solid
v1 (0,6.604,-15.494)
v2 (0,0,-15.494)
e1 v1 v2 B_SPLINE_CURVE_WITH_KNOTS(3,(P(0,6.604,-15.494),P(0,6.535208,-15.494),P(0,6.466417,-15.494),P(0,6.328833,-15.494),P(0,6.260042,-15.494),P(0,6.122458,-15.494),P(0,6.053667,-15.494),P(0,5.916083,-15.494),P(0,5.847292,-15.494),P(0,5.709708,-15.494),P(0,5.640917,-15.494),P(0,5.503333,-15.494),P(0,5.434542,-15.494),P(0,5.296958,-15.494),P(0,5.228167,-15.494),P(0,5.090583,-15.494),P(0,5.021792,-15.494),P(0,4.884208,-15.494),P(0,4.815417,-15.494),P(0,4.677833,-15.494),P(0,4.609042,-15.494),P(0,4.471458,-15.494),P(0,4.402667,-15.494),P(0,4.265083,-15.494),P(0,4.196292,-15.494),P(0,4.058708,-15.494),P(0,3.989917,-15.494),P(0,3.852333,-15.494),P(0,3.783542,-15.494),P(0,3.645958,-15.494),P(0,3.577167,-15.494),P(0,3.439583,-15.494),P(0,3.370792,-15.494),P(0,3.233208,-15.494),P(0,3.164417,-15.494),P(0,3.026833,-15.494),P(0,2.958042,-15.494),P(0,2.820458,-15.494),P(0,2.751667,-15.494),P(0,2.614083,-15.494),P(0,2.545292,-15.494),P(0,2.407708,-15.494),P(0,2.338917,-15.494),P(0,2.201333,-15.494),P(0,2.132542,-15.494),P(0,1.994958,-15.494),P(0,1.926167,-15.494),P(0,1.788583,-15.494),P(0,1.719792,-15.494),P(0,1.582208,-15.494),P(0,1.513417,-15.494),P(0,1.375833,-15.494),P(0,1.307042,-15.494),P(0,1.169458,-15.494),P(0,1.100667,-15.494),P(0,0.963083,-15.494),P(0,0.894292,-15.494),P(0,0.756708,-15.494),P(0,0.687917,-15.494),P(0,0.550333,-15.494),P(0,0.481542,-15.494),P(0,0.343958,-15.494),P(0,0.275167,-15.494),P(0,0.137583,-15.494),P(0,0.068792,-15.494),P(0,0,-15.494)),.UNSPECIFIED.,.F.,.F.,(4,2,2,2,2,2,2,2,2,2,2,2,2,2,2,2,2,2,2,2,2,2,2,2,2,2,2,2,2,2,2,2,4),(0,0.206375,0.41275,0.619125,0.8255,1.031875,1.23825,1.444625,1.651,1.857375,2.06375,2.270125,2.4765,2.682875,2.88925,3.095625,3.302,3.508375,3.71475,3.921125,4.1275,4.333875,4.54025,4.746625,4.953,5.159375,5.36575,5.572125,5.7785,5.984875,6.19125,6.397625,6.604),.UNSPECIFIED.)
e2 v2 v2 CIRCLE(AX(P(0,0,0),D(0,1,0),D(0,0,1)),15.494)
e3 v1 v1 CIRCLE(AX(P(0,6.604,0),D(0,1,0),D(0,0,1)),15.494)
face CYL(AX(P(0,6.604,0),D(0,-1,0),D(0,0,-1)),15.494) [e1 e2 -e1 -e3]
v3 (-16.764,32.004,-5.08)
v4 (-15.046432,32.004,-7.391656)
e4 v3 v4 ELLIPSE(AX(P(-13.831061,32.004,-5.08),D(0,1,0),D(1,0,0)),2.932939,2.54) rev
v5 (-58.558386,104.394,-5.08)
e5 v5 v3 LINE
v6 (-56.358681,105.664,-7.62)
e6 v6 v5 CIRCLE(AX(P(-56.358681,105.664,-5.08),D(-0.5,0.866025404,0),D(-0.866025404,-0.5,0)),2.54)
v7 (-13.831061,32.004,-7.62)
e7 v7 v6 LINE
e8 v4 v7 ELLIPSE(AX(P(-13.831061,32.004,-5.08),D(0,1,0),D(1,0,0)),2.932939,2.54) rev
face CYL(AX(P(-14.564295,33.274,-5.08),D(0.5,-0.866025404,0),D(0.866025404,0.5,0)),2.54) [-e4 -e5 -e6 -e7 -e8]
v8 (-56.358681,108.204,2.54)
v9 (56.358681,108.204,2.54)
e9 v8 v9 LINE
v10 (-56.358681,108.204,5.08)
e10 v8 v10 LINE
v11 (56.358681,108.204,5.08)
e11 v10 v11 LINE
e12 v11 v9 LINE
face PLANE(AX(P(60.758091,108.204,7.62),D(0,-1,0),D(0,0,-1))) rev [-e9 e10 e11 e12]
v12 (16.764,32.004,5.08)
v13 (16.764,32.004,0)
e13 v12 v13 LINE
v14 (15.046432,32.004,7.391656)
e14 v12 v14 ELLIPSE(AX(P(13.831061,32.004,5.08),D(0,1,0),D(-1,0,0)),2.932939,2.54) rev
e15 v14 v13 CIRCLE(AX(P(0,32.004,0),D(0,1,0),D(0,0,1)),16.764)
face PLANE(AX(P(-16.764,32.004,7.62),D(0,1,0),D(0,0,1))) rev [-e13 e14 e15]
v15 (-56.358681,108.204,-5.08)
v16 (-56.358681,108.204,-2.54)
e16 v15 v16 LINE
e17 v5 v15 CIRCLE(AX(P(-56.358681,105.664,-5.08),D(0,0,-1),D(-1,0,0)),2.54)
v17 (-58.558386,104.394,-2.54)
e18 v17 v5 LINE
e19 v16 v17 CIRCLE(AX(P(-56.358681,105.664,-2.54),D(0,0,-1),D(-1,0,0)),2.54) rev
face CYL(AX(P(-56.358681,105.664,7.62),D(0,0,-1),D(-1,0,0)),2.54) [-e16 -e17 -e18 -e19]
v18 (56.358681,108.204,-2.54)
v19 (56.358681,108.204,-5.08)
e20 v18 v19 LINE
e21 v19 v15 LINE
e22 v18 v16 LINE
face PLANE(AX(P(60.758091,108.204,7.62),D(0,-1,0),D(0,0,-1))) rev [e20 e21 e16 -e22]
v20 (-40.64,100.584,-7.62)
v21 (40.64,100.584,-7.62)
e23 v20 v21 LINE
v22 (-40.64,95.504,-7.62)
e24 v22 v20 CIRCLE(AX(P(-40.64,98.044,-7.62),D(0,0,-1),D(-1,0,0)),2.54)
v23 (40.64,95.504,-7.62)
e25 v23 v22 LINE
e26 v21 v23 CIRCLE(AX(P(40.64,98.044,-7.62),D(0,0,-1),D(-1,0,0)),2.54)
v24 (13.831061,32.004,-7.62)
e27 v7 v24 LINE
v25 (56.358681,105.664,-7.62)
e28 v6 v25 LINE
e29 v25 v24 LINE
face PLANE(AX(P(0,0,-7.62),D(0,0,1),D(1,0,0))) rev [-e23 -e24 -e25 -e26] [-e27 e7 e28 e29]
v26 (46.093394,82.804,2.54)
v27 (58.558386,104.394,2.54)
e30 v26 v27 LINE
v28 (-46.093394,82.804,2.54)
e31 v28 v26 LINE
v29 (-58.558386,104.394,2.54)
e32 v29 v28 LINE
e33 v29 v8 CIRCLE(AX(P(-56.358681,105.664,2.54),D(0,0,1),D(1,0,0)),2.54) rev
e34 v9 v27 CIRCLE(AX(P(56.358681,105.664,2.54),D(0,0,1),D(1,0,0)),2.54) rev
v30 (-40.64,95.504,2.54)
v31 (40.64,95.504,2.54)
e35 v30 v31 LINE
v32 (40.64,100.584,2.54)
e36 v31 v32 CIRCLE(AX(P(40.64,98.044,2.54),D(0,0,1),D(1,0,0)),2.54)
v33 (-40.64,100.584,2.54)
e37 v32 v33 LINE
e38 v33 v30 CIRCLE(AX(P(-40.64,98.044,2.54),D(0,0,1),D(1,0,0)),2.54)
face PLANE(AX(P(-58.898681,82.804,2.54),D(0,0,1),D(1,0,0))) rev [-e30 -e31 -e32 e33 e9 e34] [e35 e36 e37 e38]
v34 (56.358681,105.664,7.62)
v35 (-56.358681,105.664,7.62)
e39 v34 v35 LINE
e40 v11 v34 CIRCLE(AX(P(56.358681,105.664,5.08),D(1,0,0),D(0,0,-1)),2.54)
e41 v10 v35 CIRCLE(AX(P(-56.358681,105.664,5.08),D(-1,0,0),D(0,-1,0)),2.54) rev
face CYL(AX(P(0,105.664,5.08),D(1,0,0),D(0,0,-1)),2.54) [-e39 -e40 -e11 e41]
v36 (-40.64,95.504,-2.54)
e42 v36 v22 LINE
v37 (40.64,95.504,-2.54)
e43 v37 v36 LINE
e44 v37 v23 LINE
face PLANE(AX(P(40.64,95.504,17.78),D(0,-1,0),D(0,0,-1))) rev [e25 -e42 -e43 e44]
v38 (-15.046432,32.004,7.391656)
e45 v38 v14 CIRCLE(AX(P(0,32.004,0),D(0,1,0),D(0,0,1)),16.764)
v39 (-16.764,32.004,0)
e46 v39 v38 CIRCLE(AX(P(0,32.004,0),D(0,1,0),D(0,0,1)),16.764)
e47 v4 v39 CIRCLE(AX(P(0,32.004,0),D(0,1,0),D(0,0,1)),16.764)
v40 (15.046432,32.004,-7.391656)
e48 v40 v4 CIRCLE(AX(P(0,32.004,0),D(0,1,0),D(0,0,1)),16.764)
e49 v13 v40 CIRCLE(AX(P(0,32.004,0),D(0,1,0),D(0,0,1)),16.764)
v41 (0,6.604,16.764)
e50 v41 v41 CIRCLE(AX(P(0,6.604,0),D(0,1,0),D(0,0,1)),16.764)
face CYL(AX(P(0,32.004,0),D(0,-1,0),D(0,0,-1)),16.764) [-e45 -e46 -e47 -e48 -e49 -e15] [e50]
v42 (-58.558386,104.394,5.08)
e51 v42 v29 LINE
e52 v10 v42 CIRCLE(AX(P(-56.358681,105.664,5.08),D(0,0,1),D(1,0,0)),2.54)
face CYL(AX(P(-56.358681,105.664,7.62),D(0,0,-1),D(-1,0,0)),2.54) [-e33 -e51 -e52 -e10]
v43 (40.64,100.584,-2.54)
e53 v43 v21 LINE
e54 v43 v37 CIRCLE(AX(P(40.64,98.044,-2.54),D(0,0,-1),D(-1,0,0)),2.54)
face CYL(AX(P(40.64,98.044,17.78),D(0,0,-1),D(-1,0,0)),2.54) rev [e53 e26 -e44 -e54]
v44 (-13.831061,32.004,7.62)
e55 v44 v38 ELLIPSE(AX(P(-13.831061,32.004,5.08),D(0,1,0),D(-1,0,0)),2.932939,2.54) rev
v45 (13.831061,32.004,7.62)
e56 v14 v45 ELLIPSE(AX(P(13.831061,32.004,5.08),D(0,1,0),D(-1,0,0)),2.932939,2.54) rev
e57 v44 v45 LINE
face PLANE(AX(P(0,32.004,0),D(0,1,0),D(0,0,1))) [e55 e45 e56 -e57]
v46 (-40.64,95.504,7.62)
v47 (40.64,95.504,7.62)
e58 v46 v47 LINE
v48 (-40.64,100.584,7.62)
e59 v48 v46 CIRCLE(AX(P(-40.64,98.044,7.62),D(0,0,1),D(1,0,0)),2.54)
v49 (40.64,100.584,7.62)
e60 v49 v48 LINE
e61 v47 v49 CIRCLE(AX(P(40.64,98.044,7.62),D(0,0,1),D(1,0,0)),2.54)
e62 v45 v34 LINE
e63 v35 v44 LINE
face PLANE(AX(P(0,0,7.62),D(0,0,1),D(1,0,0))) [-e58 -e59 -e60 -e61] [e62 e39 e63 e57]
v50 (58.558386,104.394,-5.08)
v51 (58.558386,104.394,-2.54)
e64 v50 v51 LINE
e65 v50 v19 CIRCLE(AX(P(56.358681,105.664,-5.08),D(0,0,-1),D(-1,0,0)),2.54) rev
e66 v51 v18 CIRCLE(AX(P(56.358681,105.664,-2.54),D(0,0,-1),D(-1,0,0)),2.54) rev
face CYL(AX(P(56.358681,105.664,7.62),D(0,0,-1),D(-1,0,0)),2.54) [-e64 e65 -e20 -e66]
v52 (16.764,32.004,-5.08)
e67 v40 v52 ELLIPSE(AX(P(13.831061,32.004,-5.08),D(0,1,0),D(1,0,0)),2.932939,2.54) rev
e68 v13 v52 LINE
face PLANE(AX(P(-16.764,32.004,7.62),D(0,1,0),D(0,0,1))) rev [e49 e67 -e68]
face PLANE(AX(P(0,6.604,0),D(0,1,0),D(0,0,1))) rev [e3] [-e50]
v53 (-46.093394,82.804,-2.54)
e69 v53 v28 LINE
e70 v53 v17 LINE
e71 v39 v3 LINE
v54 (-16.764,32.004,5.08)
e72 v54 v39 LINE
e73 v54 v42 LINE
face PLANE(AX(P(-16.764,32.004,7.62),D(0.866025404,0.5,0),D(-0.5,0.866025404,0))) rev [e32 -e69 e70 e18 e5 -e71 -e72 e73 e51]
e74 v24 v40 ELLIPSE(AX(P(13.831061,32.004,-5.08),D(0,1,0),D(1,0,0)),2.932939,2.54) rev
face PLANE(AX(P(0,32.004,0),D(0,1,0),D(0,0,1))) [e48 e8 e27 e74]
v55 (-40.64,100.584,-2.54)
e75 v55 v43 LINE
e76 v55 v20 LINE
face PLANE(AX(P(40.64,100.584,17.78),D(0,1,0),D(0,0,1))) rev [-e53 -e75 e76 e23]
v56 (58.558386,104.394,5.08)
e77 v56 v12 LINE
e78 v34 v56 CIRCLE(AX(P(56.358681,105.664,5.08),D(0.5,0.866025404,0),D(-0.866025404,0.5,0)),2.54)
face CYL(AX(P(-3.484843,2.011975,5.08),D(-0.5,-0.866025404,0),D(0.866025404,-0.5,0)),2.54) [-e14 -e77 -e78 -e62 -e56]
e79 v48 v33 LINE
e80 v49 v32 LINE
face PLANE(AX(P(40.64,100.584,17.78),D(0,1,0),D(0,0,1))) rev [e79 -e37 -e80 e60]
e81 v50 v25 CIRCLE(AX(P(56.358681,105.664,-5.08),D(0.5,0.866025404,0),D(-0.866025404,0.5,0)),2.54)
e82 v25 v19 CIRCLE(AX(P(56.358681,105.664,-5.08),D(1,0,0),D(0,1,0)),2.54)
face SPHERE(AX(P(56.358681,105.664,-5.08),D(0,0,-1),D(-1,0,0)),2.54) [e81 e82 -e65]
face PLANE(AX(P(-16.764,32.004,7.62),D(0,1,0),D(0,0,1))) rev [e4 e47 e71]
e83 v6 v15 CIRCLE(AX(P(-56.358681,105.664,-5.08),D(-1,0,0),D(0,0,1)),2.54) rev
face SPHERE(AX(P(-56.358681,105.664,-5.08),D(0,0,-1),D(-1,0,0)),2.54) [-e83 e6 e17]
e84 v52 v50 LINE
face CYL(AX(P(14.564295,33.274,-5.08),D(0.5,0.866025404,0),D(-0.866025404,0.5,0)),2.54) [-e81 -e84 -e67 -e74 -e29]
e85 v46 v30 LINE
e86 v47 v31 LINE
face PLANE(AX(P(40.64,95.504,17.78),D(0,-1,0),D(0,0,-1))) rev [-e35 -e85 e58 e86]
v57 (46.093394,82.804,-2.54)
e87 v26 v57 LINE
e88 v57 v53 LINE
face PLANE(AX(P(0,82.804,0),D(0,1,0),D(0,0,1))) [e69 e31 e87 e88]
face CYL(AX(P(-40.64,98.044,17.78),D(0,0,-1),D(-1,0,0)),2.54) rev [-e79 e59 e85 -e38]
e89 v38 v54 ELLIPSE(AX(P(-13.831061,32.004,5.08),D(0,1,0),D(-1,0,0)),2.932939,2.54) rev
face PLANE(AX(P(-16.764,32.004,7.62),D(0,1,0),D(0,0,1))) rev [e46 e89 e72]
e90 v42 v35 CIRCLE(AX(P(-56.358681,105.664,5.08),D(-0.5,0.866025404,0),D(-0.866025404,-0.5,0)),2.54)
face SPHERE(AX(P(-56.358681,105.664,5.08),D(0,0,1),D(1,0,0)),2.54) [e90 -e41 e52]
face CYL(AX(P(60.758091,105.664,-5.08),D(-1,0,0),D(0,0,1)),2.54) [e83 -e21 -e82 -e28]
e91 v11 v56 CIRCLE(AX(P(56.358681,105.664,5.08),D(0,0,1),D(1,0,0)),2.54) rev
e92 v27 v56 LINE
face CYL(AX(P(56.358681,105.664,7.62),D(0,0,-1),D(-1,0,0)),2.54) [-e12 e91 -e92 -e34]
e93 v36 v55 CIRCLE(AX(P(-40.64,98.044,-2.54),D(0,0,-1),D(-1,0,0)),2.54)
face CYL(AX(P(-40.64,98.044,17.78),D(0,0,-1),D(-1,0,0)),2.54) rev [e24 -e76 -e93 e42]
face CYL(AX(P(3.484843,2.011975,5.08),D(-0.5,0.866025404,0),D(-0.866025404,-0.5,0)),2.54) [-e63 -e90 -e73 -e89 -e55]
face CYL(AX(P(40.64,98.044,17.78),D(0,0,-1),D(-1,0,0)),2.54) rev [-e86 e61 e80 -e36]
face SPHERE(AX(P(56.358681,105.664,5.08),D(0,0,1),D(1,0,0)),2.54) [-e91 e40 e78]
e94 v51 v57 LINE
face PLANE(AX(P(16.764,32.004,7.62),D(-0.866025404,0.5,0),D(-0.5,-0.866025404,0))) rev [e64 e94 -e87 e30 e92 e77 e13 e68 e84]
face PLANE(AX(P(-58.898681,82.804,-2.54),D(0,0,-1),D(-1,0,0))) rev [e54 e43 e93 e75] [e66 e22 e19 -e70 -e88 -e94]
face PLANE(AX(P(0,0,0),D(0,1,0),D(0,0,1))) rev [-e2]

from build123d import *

# Parameters (mm, degrees)
SKETCH1_R           = 15.494
BOSS_EXTRUDE1_DEPTH = 6.604
SKETCH2_R           = 16.764
BOSS_EXTRUDE2_DEPTH = 25.4
BOSS_EXTRUDE3_DEPTH = 7.62
FILLET1_R           = 2.54
SKETCH5_W           = 117.797362922
SKETCH5_H           = 5.08
CUT_EXTRUDE1_DEPTH  = 25.4
CUT_EXTRUDE2_DEPTH  = 25.4


with BuildPart() as part:
    # Sketch1 → Boss-Extrude1 (new body)
    with BuildSketch(Plane(origin=(0, 0, 0), x_dir=(1, 0, 0), z_dir=(0, 1, 0))):
        with Locations(Location((0, 0, 0), (0, 0, 90))):
            Circle(SKETCH1_R)
    extrude(amount=BOSS_EXTRUDE1_DEPTH)

    # Sketch2 → Boss-Extrude2 (add)
    with BuildSketch(Plane(origin=(0, 6.604, 0), x_dir=(1, 0, 0), z_dir=(0, 1, 0))):
        with Locations(Location((0, 0, 0), (0, 0, 270))):
            Circle(SKETCH2_R)
    extrude(amount=BOSS_EXTRUDE2_DEPTH)

    # Sketch4 → Boss-Extrude3 (add, symmetric)
    with BuildSketch(Plane.XY):
        Polygon((16.764, 32.004), (60.758090512, 108.204), (-60.758090512, 108.204), (-16.764, 32.004), align=None)
    extrude(amount=BOSS_EXTRUDE3_DEPTH, both=True)

    # Fillet1
    # the kernel refuses this fillet: 2.54 mm, written as the material it takes off along each edge
    with BuildSketch(Plane(origin=(56.358681461, 105.664, -5.08), x_dir=(0.8660254037844399, -0.49999999999999795, 0), z_dir=(0, 0, -1))) as fillet1_piece_1_section:
        Polygon((0, 0), (FILLET1_R, 0), (FILLET1_R, -FILLET1_R * 1.73205080757), (-FILLET1_R * 0.5, -FILLET1_R * 0.866025403784), align=None)
    fillet1_piece_1 = extrude(amount=FILLET1_R, mode=Mode.PRIVATE)
    fillet1_piece_1 = fillet1_piece_1 - Plane(origin=(56.358681461, 105.664, -5.08), x_dir=(-0.8660254037844382, -0.500000000000001, 0), z_dir=(0, 0, -1)) * Sphere(FILLET1_R, mode=Mode.PRIVATE)
    add(fillet1_piece_1, mode=Mode.SUBTRACT)
    with BuildSketch(Plane(origin=(-56.358681461, 105.664, -5.08), x_dir=(0, 1, 0), z_dir=(0, 0, -1))) as fillet1_piece_2_section:
        Polygon((0, 0), (FILLET1_R, 0), (FILLET1_R, -FILLET1_R * 1.73205080757), (-FILLET1_R * 0.5, -FILLET1_R * 0.866025403784), align=None)
    fillet1_piece_2 = extrude(amount=FILLET1_R, mode=Mode.PRIVATE)
    fillet1_piece_2 = fillet1_piece_2 - Plane(origin=(-56.358681461, 105.664, -5.08), x_dir=(0.8660254037844382, -0.500000000000001, 0), z_dir=(0, 0, -1)) * Sphere(FILLET1_R, mode=Mode.PRIVATE)
    add(fillet1_piece_2, mode=Mode.SUBTRACT)
    with BuildSketch(Plane(origin=(56.358681461, 105.664, 5.08), x_dir=(0.8660254037844399, -0.49999999999999795, 0), z_dir=(0, 0, 1))) as fillet1_piece_3_section:
        Polygon((0, 0), (FILLET1_R, 0), (FILLET1_R, FILLET1_R * 1.73205080757), (-FILLET1_R * 0.5, FILLET1_R * 0.866025403784), align=None)
    fillet1_piece_3 = extrude(amount=FILLET1_R, mode=Mode.PRIVATE)
    fillet1_piece_3 = fillet1_piece_3 - Plane(origin=(56.358681461, 105.664, 5.08), x_dir=(-0.8660254037844382, -0.500000000000001, 0), z_dir=(0, 0, 1)) * Sphere(FILLET1_R, mode=Mode.PRIVATE)
    add(fillet1_piece_3, mode=Mode.SUBTRACT)
    with BuildSketch(Plane(origin=(-56.358681461, 105.664, 5.08), x_dir=(-0.8660254037844399, -0.49999999999999795, 0), z_dir=(0, 0, 1))) as fillet1_piece_4_section:
        Polygon((0, 0), (FILLET1_R, 0), (FILLET1_R, -FILLET1_R * 1.73205080757), (-FILLET1_R * 0.5, -FILLET1_R * 0.866025403784), align=None)
    fillet1_piece_4 = extrude(amount=FILLET1_R, mode=Mode.PRIVATE)
    fillet1_piece_4 = fillet1_piece_4 - Plane(origin=(-56.358681461, 105.664, 5.08), x_dir=(0.8660254037844382, -0.500000000000001, 0), z_dir=(0, 0, 1)) * Sphere(FILLET1_R, mode=Mode.PRIVATE)
    add(fillet1_piece_4, mode=Mode.SUBTRACT)
    with BuildSketch(Plane(origin=(13.589, 26.504738686, -7.62), x_dir=(-0.8660254037844398, 0.499999999999998, 0), z_dir=(0.49999999999999795, 0.8660254037844399, 0))) as fillet1_piece_5_section:
        with BuildLine():
            CenterArc((FILLET1_R, FILLET1_R), FILLET1_R, 180, 90)
            Line((0, FILLET1_R), (0, 0))
            Line((0, 0), (FILLET1_R, 0))
        make_face()
    fillet1_piece_5 = extrude(amount=89.938771973, mode=Mode.PRIVATE)
    fillet1_piece_5 = split(fillet1_piece_5, bisect_by=Plane(origin=(37.078105995, 32.004, -7.046175079), z_dir=(0, 1, 0)), keep=Keep.TOP, mode=Mode.PRIVATE)
    add(fillet1_piece_5, mode=Mode.SUBTRACT)
    with BuildSketch(Plane(origin=(56.358681461, 108.204, -7.62), x_dir=(0, -1, 0), z_dir=(-1, 0, 0))) as fillet1_piece_6:
        with BuildLine():
            CenterArc((FILLET1_R, FILLET1_R), FILLET1_R, 180, 90)
            Line((0, FILLET1_R), (0, 0))
            Line((0, 0), (FILLET1_R, 0))
        make_face()
    extrude(amount=112.717362922, mode=Mode.SUBTRACT)
    with BuildSketch(Plane(origin=(60.758090512, 108.204, -5.08), x_dir=(-0.49999999999999645, -0.8660254037844407, 0), z_dir=(0, 0, 1))) as fillet1_piece_7:
        with BuildLine():
            CenterArc((FILLET1_R * 1.73205080757, -FILLET1_R), FILLET1_R, 90, 120)
            Line((FILLET1_R * 0.866025403784, -FILLET1_R * 1.5), (0, 0))
            Line((0, 0), (FILLET1_R * 1.73205080757, 0))
        make_face()
    extrude(amount=10.16, mode=Mode.SUBTRACT)
    with BuildSketch(Plane(origin=(-58.558385987, 104.394, -7.62), x_dir=(0, 0, 1), z_dir=(0.49999999999999795, -0.8660254037844399, 0))) as fillet1_piece_8_section:
        with BuildLine():
            CenterArc((FILLET1_R, -FILLET1_R), FILLET1_R, 90, 90)
            Line((0, -FILLET1_R), (0, 0))
            Line((0, 0), (FILLET1_R, 0))
        make_face()
    fillet1_piece_8 = extrude(amount=89.938771973, mode=Mode.PRIVATE)
    fillet1_piece_8 = split(fillet1_piece_8, bisect_by=Plane(origin=(-37.078105995, 32.004, -7.046175079), z_dir=(0, 1, 0)), keep=Keep.TOP, mode=Mode.PRIVATE)
    add(fillet1_piece_8, mode=Mode.SUBTRACT)
    with BuildSketch(Plane(origin=(-60.758090512, 108.204, -5.08), x_dir=(0.4999999999999989, -0.8660254037844393, 0), z_dir=(0, 0, 1))) as fillet1_piece_9:
        with BuildLine():
            CenterArc((FILLET1_R * 1.73205080757, FILLET1_R), FILLET1_R, 150, 120)
            Line((FILLET1_R * 0.866025403784, FILLET1_R * 1.5), (0, 0))
            Line((0, 0), (FILLET1_R * 1.73205080757, 0))
        make_face()
    extrude(amount=10.16, mode=Mode.SUBTRACT)
    with BuildSketch(Plane(origin=(13.589, 26.504738686, 7.62), x_dir=(-0.8660254037844398, 0.499999999999998, 0), z_dir=(0.49999999999999795, 0.8660254037844399, 0))) as fillet1_piece_10_section:
        with BuildLine():
            CenterArc((FILLET1_R, -FILLET1_R), FILLET1_R, 90, 90)
            Line((0, -FILLET1_R), (0, 0))
            Line((0, 0), (FILLET1_R, 0))
        make_face()
    fillet1_piece_10 = extrude(amount=89.938771973, mode=Mode.PRIVATE)
    fillet1_piece_10 = split(fillet1_piece_10, bisect_by=Plane(origin=(37.078105995, 32.004, 7.046175079), z_dir=(0, 1, 0)), keep=Keep.TOP, mode=Mode.PRIVATE)
    add(fillet1_piece_10, mode=Mode.SUBTRACT)
    with BuildSketch(Plane(origin=(56.358681461, 108.204, 7.62), x_dir=(0, -1, 0), z_dir=(-1, 0, 0))) as fillet1_piece_11:
        with BuildLine():
            CenterArc((FILLET1_R, -FILLET1_R), FILLET1_R, 90, 90)
            Line((0, -FILLET1_R), (0, 0))
            Line((0, 0), (FILLET1_R, 0))
        make_face()
    extrude(amount=112.717362922, mode=Mode.SUBTRACT)
    with BuildSketch(Plane(origin=(-58.558385987, 104.394, 7.62), x_dir=(0.8660254037844399, 0.499999999999998, 0), z_dir=(0.49999999999999795, -0.8660254037844399, 0))) as fillet1_piece_12_section:
        with BuildLine():
            CenterArc((FILLET1_R, -FILLET1_R), FILLET1_R, 90, 90)
            Line((0, -FILLET1_R), (0, 0))
            Line((0, 0), (FILLET1_R, 0))
        make_face()
    fillet1_piece_12 = extrude(amount=89.938771973, mode=Mode.PRIVATE)
    fillet1_piece_12 = split(fillet1_piece_12, bisect_by=Plane(origin=(-37.078105995, 32.004, 7.046175079), z_dir=(0, 1, 0)), keep=Keep.TOP, mode=Mode.PRIVATE)
    add(fillet1_piece_12, mode=Mode.SUBTRACT)

    # Sketch5 → Cut-Extrude1 (cut)
    with BuildSketch(Plane(origin=(0, 108.204, 0), x_dir=(1, 0, 0), z_dir=(0, 1, 0))):
        Rectangle(SKETCH5_W, SKETCH5_H)
    extrude(amount=-CUT_EXTRUDE1_DEPTH, mode=Mode.SUBTRACT)

    # Sketch6 → Cut-Extrude2 (cut)
    with BuildSketch(Plane(origin=(0, 0, -7.62), x_dir=(-1, 0, 0), z_dir=(0, 0, -1))):
        with BuildLine():
            Line((-40.64, 100.584), (40.64, 100.584))
            ThreePointArc((40.64, 100.584), (43.18, 98.044), (40.64, 95.504))
            Line((40.64, 95.504), (-40.64, 95.504))
            ThreePointArc((-40.64, 95.504), (-43.18, 98.044), (-40.64, 100.584))
        make_face()
    extrude(amount=-CUT_EXTRUDE2_DEPTH, mode=Mode.SUBTRACT)


solid = part.part
